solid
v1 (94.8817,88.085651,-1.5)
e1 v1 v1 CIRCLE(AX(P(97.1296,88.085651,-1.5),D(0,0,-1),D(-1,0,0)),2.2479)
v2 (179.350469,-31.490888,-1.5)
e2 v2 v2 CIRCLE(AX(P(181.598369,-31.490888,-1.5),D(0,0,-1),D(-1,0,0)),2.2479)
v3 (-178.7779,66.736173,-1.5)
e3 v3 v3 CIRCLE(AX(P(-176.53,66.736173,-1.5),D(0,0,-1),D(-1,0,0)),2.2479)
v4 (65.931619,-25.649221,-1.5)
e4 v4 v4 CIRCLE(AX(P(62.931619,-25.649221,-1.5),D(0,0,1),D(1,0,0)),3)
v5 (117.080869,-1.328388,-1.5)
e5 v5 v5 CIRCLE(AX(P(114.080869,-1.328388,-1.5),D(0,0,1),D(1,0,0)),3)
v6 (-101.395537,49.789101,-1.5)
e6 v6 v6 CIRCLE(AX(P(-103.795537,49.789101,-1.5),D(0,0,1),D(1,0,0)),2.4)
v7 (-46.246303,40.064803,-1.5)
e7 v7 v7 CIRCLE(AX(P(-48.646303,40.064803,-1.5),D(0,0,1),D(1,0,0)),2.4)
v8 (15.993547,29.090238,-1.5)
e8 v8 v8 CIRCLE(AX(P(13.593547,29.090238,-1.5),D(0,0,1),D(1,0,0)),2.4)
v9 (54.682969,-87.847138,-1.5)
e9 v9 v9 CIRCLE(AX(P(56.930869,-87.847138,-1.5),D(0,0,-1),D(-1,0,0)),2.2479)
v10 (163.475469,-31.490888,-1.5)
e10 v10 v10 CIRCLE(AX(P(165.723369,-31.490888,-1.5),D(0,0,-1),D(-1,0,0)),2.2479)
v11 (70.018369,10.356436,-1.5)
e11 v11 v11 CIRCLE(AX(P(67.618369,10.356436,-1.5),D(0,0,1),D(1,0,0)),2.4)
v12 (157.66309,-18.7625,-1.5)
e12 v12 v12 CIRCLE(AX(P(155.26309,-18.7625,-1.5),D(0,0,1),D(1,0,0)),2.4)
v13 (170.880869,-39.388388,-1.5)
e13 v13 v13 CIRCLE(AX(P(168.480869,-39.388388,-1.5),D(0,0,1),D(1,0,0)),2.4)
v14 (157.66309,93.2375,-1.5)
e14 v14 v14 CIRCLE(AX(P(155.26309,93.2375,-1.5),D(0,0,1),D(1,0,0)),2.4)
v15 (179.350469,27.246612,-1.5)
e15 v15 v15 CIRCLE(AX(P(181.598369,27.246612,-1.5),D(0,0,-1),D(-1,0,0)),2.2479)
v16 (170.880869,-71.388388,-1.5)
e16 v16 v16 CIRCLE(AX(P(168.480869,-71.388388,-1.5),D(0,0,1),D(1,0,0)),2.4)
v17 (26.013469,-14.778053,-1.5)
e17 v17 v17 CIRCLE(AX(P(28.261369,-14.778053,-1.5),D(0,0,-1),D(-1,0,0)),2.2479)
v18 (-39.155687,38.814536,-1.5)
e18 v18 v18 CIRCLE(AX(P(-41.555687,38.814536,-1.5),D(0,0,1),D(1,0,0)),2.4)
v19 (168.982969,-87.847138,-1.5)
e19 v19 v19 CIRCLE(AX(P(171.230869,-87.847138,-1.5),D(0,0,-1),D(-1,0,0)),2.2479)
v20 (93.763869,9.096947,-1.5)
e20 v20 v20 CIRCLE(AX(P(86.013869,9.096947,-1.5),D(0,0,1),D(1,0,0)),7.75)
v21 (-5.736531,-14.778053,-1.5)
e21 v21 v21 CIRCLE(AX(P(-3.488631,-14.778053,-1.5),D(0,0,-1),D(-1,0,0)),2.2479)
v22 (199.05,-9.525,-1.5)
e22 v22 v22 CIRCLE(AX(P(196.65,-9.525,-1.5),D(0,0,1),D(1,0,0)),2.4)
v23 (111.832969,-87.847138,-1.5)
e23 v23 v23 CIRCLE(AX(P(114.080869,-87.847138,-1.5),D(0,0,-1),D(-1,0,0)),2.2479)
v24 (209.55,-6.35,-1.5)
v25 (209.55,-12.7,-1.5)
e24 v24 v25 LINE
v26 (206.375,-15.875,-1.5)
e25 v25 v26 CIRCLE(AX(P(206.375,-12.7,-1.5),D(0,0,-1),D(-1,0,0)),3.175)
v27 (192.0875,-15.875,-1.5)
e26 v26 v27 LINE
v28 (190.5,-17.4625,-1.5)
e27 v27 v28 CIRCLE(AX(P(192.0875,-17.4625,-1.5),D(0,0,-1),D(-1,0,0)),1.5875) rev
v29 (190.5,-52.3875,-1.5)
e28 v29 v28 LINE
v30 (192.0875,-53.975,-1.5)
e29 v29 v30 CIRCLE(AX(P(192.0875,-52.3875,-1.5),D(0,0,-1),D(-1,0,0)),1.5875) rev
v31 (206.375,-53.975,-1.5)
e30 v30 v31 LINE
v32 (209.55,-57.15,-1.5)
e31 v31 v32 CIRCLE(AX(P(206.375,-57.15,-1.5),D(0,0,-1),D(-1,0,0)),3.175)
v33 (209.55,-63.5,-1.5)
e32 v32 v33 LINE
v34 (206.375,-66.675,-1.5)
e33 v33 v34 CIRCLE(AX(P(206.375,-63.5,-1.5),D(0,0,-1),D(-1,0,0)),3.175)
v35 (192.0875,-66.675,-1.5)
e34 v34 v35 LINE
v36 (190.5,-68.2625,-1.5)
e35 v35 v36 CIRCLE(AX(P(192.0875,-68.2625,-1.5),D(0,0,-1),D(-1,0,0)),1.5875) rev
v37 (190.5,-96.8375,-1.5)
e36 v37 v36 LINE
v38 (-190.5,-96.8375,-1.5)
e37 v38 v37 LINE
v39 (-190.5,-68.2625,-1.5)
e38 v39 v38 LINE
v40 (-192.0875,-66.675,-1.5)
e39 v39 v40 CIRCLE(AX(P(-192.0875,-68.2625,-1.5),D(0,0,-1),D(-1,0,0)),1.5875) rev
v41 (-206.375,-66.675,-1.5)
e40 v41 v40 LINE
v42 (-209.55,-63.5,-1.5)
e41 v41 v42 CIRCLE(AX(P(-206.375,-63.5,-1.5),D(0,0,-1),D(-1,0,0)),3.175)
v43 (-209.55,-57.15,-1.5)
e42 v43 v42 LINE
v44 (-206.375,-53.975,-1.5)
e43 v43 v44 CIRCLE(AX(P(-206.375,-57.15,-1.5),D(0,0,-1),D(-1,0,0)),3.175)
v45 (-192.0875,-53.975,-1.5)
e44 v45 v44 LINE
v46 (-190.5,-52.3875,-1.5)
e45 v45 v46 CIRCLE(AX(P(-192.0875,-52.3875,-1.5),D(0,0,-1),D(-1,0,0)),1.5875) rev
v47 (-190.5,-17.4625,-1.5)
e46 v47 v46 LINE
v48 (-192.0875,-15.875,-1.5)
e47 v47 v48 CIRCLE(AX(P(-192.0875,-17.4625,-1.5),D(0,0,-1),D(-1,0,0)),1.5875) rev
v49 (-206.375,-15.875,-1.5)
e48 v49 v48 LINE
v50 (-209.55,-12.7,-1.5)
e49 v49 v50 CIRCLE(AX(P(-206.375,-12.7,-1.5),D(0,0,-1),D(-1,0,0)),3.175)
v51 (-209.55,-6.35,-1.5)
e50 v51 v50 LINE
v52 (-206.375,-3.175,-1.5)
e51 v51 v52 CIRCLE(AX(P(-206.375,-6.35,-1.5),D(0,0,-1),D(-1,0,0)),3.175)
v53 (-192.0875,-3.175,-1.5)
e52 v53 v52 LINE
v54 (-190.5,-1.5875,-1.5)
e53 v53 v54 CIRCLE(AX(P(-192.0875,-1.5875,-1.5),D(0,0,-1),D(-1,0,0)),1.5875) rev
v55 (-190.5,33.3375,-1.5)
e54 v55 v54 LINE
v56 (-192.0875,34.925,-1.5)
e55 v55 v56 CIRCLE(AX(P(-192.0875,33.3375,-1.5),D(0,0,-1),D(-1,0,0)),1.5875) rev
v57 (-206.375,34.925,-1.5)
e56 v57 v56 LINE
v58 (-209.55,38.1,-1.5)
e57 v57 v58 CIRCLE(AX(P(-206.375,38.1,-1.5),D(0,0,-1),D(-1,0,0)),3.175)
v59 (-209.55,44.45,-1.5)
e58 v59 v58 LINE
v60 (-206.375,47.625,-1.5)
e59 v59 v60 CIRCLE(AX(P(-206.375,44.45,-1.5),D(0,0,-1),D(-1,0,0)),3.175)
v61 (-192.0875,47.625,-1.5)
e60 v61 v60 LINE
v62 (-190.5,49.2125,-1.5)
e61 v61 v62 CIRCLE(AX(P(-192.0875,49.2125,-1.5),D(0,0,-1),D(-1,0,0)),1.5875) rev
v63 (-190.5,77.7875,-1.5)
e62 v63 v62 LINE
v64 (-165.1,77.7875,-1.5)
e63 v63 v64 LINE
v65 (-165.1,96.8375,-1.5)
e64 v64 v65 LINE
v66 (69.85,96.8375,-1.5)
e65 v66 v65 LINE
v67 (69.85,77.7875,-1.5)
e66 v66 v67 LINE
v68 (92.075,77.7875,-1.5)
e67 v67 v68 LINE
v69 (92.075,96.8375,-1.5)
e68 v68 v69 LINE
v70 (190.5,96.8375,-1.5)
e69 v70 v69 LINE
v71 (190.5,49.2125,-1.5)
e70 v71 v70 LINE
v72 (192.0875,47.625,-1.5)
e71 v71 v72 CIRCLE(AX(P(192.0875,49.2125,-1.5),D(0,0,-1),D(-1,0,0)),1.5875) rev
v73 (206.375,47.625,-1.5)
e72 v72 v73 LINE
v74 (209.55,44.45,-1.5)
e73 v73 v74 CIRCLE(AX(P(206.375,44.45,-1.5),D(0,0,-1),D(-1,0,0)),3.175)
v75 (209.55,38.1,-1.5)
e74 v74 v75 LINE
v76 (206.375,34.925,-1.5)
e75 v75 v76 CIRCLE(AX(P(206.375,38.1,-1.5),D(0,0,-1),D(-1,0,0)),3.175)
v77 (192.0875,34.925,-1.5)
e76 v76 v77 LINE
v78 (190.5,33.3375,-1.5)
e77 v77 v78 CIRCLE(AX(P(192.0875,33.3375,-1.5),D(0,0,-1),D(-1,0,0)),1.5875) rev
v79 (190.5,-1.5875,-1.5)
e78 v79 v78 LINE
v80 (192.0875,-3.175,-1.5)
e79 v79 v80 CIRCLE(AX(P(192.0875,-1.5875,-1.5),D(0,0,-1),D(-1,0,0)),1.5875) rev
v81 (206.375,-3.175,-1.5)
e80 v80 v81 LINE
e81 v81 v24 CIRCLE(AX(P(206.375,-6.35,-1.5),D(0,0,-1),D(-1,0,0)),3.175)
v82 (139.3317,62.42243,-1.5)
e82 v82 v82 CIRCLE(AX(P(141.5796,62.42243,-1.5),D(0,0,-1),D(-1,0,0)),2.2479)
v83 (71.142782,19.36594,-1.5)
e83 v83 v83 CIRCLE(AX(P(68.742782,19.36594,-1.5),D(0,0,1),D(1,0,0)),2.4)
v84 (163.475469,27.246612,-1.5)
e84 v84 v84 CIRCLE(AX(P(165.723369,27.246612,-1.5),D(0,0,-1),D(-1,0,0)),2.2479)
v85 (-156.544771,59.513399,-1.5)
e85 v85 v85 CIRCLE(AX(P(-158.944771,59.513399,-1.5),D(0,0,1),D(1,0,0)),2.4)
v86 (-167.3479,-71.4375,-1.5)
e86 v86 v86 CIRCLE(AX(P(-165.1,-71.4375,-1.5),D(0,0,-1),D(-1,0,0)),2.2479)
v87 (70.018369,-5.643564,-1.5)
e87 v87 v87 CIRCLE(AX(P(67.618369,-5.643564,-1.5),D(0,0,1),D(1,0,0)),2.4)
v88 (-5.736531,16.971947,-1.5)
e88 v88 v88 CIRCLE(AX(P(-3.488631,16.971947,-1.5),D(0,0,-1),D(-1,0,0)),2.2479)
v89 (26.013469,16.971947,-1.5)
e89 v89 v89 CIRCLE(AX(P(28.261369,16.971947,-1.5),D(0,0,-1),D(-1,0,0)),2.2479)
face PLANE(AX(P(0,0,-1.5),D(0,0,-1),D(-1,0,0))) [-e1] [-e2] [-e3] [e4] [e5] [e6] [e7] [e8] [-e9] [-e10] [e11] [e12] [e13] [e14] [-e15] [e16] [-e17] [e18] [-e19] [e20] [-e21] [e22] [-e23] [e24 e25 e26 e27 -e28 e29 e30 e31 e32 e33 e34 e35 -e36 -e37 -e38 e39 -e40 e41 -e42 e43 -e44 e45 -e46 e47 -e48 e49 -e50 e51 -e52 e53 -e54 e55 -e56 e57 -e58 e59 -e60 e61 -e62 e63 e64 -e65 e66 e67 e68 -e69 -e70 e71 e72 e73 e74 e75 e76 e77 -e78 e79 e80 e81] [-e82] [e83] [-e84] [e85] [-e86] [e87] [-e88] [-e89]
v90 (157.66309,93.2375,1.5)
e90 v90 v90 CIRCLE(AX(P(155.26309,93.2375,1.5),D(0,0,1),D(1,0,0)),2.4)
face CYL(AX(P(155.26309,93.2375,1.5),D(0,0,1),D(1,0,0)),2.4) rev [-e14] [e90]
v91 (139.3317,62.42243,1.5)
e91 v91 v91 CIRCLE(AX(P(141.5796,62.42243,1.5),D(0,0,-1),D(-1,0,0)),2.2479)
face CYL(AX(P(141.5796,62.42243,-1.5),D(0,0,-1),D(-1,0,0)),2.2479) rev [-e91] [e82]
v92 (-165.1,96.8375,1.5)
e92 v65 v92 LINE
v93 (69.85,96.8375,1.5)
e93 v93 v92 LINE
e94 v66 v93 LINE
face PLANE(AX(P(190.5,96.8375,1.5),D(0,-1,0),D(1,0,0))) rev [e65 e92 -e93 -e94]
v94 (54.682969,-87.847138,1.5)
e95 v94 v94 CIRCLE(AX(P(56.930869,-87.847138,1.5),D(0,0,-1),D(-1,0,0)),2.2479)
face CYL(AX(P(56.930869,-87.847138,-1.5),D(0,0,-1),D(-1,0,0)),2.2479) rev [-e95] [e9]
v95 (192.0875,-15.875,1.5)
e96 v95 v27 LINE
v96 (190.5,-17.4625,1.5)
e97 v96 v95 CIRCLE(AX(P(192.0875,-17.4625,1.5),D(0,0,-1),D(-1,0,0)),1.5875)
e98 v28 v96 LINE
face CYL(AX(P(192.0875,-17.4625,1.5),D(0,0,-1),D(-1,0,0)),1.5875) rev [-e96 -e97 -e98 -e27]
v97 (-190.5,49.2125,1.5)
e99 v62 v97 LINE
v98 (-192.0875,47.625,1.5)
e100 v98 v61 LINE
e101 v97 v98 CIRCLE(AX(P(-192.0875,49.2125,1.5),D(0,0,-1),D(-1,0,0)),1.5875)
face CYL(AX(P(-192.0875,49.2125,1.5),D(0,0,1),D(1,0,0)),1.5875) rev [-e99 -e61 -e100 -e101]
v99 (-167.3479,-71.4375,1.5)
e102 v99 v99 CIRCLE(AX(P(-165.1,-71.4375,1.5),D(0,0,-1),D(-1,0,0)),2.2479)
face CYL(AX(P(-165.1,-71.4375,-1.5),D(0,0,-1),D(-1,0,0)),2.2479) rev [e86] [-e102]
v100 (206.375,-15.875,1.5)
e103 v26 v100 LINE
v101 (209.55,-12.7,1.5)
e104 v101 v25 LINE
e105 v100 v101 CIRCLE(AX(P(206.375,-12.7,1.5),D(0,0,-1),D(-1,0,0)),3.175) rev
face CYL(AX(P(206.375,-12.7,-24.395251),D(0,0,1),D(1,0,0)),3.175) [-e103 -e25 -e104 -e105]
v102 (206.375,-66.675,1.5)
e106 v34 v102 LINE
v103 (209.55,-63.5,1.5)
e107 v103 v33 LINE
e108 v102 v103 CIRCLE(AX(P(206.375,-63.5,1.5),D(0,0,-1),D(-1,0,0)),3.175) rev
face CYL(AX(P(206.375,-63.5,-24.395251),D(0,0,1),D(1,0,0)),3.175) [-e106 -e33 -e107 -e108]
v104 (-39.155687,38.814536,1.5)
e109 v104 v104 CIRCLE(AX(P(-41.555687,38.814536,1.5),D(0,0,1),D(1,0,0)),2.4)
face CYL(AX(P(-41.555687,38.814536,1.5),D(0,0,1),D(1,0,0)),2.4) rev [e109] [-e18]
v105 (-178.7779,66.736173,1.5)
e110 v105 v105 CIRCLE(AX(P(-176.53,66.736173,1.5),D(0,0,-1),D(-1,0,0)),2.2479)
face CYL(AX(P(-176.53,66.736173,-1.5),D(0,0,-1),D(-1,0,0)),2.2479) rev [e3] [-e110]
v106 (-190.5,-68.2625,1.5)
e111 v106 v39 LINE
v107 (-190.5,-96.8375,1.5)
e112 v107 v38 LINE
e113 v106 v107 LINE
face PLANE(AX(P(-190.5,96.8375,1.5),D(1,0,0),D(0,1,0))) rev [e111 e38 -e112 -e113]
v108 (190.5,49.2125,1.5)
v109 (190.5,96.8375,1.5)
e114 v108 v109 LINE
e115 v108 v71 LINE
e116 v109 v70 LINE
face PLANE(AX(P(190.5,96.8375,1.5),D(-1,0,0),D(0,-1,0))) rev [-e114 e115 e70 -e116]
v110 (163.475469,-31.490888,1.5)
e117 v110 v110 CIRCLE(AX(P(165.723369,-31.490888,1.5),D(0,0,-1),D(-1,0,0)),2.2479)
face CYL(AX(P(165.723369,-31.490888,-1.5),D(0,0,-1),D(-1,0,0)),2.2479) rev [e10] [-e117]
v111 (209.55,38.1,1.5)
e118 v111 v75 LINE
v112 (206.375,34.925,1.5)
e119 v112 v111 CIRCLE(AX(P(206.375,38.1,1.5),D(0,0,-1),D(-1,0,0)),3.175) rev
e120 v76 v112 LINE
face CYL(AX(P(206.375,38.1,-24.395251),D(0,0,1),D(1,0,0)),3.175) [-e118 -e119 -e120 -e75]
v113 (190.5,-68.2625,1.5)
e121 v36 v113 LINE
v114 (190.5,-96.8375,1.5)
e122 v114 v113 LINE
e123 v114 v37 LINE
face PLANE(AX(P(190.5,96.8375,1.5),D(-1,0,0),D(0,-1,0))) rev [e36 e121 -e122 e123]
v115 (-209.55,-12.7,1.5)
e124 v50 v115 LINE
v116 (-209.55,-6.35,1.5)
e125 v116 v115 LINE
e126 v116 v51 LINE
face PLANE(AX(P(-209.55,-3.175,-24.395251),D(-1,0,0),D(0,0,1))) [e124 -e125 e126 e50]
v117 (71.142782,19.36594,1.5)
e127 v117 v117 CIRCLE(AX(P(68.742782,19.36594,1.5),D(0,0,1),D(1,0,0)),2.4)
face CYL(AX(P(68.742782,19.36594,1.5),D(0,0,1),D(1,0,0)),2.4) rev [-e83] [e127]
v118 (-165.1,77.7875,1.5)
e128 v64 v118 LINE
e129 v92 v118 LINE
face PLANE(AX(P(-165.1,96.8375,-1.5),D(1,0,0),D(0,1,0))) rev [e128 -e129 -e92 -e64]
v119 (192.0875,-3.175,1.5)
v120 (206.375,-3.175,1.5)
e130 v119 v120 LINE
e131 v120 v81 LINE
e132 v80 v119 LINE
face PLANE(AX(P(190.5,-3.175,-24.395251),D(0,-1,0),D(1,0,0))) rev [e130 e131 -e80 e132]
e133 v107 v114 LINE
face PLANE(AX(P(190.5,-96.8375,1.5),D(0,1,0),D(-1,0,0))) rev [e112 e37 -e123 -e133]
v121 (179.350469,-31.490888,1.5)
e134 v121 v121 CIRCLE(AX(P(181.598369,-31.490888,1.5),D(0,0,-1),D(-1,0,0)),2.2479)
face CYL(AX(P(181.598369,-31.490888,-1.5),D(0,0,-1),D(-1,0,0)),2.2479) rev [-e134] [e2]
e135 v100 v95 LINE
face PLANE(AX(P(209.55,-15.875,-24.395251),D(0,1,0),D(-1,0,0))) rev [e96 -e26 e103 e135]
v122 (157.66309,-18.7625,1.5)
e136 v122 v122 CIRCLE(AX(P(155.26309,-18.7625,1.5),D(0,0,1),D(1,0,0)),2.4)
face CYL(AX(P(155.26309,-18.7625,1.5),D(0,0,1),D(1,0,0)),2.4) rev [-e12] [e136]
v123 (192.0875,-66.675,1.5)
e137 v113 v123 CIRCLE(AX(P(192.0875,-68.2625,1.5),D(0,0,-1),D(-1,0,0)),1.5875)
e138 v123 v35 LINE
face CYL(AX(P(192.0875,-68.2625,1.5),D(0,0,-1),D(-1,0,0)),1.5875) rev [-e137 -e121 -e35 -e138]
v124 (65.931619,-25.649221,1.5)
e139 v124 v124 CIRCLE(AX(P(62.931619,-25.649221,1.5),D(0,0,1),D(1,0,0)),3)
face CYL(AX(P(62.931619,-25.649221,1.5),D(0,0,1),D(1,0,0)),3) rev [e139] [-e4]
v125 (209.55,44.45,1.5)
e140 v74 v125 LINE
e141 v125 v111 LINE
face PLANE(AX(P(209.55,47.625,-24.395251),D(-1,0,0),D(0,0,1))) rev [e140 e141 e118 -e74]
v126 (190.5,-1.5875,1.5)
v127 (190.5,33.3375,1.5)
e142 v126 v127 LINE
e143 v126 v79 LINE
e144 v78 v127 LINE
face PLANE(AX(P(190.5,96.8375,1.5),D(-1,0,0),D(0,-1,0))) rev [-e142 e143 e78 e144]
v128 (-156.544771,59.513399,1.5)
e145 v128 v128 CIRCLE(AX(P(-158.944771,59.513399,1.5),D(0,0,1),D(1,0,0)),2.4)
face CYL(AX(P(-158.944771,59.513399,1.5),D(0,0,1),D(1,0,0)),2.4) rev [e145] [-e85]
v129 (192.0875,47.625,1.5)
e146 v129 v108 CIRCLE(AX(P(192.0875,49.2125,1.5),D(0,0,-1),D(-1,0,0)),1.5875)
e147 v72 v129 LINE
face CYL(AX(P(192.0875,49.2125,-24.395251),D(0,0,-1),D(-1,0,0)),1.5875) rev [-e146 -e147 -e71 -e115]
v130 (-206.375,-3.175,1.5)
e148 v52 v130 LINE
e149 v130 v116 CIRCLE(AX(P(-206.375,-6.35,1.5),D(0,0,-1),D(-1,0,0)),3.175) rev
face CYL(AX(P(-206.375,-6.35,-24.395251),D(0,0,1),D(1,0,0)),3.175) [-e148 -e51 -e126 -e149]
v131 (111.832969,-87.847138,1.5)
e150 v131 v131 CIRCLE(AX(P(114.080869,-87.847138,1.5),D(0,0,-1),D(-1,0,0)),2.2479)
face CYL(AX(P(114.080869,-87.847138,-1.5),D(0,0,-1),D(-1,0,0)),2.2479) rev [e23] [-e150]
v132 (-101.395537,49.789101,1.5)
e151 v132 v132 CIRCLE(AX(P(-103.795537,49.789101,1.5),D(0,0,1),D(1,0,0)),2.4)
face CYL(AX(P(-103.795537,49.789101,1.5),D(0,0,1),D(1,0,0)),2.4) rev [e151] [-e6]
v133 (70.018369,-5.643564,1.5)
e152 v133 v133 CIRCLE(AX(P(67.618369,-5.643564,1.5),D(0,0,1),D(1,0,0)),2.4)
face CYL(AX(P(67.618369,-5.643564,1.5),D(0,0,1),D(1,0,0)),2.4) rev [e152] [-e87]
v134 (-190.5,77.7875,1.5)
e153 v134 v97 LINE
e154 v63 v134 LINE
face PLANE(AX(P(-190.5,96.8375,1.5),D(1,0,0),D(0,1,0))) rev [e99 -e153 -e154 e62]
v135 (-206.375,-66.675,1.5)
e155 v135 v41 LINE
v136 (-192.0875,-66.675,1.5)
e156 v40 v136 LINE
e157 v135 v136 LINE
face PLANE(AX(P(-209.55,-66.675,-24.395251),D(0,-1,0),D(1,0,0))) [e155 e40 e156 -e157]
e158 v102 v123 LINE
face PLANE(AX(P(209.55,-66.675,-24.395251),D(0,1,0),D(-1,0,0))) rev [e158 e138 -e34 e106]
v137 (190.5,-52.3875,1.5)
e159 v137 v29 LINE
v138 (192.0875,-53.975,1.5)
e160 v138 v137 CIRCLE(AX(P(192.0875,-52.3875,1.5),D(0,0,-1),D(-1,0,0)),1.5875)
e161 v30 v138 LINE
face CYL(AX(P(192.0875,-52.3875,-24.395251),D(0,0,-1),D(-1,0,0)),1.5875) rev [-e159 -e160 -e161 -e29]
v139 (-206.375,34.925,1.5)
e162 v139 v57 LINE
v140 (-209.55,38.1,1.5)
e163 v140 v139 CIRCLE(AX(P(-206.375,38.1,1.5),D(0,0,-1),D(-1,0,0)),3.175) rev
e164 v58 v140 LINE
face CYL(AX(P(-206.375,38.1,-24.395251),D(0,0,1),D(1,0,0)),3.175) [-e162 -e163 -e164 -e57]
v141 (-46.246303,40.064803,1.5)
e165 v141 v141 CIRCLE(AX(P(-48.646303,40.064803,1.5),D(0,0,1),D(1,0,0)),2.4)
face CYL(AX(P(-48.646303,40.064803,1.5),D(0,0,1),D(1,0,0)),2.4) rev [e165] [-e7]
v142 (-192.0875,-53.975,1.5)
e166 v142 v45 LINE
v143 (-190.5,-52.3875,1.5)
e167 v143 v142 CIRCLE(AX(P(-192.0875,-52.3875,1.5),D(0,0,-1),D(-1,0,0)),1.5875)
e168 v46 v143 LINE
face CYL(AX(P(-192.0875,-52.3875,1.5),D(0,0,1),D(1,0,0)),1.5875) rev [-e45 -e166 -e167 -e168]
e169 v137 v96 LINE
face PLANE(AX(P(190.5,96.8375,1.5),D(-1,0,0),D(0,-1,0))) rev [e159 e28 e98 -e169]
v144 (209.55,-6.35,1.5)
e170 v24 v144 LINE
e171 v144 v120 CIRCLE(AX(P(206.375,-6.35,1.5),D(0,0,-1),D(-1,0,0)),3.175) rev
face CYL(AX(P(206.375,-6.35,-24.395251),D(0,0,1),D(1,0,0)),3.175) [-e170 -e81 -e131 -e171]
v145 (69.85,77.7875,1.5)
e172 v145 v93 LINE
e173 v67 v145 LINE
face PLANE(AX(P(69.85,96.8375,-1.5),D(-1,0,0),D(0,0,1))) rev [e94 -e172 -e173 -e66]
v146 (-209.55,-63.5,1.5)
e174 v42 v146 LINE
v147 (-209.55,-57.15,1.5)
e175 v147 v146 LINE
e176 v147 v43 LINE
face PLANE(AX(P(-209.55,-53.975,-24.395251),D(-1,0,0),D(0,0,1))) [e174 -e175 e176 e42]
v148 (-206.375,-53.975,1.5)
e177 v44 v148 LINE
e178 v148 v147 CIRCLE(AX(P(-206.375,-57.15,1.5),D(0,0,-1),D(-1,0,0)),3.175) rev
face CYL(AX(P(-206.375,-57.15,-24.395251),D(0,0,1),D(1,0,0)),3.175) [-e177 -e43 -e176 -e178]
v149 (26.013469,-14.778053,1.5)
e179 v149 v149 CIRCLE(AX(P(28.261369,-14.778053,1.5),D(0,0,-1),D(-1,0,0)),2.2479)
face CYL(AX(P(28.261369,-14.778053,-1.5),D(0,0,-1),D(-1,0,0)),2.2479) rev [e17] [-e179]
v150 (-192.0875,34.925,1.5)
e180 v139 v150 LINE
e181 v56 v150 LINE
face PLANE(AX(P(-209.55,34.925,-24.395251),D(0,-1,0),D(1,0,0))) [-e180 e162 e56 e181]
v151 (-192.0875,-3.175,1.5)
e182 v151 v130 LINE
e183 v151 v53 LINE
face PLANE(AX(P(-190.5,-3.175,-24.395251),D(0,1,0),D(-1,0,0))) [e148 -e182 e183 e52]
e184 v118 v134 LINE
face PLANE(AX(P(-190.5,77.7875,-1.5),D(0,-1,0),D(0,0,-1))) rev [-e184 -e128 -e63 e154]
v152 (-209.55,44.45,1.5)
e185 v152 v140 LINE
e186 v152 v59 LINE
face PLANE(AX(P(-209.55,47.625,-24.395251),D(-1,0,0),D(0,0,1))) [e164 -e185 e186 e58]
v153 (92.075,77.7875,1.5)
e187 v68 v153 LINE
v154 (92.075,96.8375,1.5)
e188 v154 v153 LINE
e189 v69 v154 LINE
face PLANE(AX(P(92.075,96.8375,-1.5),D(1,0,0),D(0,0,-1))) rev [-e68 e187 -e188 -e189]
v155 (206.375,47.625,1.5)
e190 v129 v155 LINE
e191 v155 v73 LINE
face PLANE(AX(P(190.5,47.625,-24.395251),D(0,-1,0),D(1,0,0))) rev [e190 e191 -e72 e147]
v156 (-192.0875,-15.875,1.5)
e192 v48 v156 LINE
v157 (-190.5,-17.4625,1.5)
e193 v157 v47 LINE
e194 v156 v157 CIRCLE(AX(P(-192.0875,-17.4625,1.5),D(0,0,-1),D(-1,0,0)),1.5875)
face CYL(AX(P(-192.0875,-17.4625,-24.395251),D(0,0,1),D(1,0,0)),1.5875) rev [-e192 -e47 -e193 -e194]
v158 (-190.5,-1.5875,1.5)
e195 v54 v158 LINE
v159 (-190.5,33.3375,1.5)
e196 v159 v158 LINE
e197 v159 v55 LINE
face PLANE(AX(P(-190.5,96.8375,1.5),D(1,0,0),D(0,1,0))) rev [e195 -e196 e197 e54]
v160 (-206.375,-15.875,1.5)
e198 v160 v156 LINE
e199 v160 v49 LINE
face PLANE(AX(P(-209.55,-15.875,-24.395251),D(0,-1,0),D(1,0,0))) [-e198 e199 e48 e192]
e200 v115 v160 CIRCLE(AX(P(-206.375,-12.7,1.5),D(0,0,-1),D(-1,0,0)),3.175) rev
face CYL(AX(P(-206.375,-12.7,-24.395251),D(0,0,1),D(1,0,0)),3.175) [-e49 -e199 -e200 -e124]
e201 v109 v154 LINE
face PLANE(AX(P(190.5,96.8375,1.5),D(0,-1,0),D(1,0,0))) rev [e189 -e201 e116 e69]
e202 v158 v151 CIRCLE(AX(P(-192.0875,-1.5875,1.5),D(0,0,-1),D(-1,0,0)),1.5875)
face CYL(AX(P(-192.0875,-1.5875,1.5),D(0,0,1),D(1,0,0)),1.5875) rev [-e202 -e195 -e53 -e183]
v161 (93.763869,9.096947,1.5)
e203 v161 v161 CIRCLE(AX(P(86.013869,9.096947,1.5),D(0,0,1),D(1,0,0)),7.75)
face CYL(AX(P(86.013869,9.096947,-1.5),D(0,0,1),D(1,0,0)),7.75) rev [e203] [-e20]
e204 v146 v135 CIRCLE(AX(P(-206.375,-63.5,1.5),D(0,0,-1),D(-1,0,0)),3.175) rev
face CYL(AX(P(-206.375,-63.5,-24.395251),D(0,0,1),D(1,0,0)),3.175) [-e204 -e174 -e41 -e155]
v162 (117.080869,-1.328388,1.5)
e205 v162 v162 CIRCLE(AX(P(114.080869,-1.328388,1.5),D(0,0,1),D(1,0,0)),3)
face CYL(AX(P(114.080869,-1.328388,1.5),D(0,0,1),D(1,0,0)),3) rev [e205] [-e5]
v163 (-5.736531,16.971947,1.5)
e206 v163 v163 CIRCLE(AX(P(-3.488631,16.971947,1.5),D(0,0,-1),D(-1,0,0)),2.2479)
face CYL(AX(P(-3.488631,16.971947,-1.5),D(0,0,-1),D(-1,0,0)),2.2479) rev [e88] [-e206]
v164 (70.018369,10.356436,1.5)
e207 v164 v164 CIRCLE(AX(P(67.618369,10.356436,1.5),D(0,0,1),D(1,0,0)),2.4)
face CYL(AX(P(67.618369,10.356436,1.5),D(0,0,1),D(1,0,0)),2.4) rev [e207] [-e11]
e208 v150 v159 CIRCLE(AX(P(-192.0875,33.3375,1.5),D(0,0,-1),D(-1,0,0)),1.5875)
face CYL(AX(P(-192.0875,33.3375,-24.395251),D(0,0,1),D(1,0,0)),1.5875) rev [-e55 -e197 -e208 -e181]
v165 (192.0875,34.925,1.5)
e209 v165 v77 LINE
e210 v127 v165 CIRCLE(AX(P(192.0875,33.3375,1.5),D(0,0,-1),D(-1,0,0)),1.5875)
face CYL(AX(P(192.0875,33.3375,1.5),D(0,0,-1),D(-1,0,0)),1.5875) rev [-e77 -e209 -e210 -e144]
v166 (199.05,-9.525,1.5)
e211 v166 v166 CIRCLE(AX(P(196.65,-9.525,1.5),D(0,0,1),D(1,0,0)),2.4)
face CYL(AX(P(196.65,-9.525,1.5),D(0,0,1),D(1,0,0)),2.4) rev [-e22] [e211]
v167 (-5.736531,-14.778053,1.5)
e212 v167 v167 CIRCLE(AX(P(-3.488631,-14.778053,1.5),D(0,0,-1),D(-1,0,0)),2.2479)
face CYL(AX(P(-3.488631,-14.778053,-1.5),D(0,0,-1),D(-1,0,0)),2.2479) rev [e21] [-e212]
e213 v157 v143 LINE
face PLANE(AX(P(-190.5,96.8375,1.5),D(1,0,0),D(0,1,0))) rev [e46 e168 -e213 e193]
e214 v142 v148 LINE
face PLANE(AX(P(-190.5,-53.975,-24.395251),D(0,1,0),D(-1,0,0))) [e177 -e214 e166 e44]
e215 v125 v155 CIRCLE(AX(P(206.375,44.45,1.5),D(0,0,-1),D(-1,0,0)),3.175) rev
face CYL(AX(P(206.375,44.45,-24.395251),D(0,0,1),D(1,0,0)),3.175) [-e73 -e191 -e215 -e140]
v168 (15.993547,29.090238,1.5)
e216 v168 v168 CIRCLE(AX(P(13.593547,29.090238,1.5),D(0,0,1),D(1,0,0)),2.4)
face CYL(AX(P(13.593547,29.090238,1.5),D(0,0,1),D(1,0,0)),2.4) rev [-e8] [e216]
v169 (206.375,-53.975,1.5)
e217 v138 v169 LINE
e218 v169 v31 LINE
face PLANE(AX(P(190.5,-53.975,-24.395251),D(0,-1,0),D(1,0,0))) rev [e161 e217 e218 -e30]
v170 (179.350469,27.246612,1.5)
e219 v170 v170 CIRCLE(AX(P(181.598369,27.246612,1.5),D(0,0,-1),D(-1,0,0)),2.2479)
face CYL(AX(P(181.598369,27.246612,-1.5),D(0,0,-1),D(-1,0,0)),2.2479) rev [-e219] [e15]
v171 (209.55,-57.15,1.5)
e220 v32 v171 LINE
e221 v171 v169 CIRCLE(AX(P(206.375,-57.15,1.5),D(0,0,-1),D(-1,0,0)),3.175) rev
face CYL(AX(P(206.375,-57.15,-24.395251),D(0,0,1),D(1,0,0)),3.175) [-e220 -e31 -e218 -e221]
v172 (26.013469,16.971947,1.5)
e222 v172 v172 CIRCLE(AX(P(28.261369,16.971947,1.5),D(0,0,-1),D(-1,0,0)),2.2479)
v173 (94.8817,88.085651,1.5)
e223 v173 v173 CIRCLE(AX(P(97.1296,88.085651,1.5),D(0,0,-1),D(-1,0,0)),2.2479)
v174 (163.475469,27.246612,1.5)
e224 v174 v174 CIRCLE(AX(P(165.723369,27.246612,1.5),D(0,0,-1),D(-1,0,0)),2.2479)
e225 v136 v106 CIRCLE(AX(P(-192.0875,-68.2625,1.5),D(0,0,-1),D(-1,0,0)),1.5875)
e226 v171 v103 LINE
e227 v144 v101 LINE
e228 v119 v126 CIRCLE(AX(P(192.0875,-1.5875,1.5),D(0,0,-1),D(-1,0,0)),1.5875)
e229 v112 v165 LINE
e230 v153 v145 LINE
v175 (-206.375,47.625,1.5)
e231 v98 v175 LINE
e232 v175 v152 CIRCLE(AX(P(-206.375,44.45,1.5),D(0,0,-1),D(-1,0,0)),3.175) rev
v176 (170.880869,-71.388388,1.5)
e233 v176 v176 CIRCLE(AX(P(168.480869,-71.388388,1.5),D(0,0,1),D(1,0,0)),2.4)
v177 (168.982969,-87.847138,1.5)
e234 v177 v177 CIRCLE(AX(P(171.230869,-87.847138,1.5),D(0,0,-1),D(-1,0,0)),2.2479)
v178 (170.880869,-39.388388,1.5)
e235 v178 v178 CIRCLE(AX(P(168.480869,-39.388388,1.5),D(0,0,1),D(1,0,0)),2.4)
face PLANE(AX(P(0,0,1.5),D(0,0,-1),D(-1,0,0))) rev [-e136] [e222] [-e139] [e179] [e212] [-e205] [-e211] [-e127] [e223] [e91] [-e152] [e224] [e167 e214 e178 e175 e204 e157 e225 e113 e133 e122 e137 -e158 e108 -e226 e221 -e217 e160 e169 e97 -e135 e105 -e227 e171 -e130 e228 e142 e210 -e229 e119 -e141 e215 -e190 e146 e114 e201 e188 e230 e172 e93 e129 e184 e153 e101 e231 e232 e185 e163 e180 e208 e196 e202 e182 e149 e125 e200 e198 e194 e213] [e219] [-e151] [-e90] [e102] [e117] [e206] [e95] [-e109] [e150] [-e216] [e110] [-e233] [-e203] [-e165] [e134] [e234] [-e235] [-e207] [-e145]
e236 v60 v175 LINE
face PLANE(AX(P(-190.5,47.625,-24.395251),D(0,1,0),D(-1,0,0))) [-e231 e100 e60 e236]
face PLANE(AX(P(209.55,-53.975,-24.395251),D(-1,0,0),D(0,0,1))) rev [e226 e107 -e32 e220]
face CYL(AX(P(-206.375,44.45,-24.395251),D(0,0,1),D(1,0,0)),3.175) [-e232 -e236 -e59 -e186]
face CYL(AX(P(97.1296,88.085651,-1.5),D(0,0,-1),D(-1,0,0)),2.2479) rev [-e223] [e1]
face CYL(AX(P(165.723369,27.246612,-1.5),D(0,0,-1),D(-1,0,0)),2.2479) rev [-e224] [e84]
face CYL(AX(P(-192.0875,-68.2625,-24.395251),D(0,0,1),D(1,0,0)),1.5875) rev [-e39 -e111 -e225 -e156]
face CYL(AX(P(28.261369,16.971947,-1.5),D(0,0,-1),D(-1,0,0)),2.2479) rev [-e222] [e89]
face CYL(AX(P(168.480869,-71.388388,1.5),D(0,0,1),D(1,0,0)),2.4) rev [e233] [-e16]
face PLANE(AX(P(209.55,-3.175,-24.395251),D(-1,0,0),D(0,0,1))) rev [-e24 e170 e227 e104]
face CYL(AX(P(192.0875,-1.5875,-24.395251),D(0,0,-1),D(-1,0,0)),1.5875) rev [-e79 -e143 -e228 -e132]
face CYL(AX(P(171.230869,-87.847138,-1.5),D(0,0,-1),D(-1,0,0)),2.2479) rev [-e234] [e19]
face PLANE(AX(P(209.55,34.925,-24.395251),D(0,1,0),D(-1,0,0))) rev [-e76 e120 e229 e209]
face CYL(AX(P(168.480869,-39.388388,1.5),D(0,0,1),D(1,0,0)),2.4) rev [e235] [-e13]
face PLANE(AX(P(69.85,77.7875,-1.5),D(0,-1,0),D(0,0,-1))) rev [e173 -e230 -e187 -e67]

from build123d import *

# Parameters (mm, degrees)
SKETCH1_W                  = 381
SKETCH1_H                  = 193.675
BOSS_EXTRUDE1_DEPTH        = 1.5
CUT_EXTRUDE1_DEPTH         = 214.72120018
CUT_EXTRUDE1_DEPTH_BACK    = 214.72120018
SKETCH2_W                  = 25.4
SKETCH2_H                  = 19.05
SKETCH2_W_2                = 22.225
SKETCH3_W                  = 19.05
SKETCH3_H                  = 12.7
BOSS_EXTRUDE2_DEPTH        = 3
FILLET1_R                  = 3.175
FILLET1_OF_MIRROR1_R       = 3.175
FILLET2_R                  = 1.5875
LPATTERN1_START            = -1.5
LPATTERN1_DEPTH            = 3
F_1_0MM_DOWEL_HOLE6_D      = 6
F_1_0MM_DOWEL_HOLE5_D      = 6
SKETCH10_R                 = 7.75
CUT_EXTRUDE2_DEPTH         = 231.862954816
F_8_CLEARANCE_HOLE1_D      = 4.4958
F_1_0MM_DOWEL_HOLE1_D      = 4.8
F_1_0_4_8_DIAMETER_HOLE1_D = 4.8


# Read off the part's stored shape, not the designer's step: LPattern1
with BuildPart() as part:
    # Sketch1 → Boss-Extrude1 (new, symmetric)
    with BuildSketch(Plane.XY):
        Rectangle(SKETCH1_W, SKETCH1_H)
    extrude(amount=BOSS_EXTRUDE1_DEPTH, both=True)

    # Sketch2 → Cut-Extrude1 (cut, two sides: drawn at the far end of the back side and taken through both)
    with BuildSketch(Plane.XY.offset(1.5).offset(-CUT_EXTRUDE1_DEPTH_BACK)):
        with Locations((-177.8, 87.3125)):
            Rectangle(SKETCH2_W, SKETCH2_H)
        with Locations((80.9625, 87.3125)):
            Rectangle(SKETCH2_W_2, SKETCH2_H)
    extrude(amount=CUT_EXTRUDE1_DEPTH + CUT_EXTRUDE1_DEPTH_BACK, mode=Mode.SUBTRACT)

    # Sketch3 → Boss-Extrude2 (add)
    with BuildSketch(Plane.XY.offset(1.5)):
        with Locations((-200.025, -9.525)):
            Rectangle(SKETCH3_W, SKETCH3_H)
    boss_extrude2 = extrude(amount=-BOSS_EXTRUDE2_DEPTH)

    # Fillet1
    fillet1_edges = [part.edges().sort_by_distance(p)[0] for p in [
        (-209.55, -3.175, 0),
        (-209.55, -15.875, 0),
    ]]
    fillet(fillet1_edges, radius=FILLET1_R)

    # Mirror1: Boss-Extrude2 across plane
    add(boss_extrude2.mirror(Plane(origin=(0, 0, 0), x_dir=(0, 0, 1), z_dir=(1, 0, 0))))

    # Fillet1 of Mirror1
    fillet1_of_mirror1_edges = [part.edges().sort_by_distance(p)[0] for p in [
        (209.55, -3.175, 0),
        (209.55, -15.875, 0),
    ]]
    fillet(fillet1_of_mirror1_edges, radius=FILLET1_OF_MIRROR1_R)

    # Fillet2
    fillet2_edges = [part.edges().sort_by_distance(p)[0] for p in [
        (-190.5, -15.875, 0),
        (-190.5, -3.175, 0),
        (190.5, -15.875, 0),
        (190.5, -3.175, 0),
    ]]
    fillet(fillet2_edges, radius=FILLET2_R)

    # LPattern1 outline → LPattern1 (add)
    with BuildSketch(Plane.XY.offset(LPATTERN1_START)):
        with BuildLine():
            ThreePointArc((-206.375, 47.625), (-208.62006403, 46.69506403), (-209.55, 44.45))
            Line((-209.55, 44.45), (-209.55, 38.1))
            ThreePointArc((-209.55, 38.1), (-208.62006403, 35.85493597), (-206.375, 34.925))
            Line((-206.375, 34.925), (-192.0875, 34.925))
            ThreePointArc((-192.0875, 34.925), (-190.964967985, 34.460032015), (-190.5, 33.3375))
            Line((-190.5, 33.3375), (-190.5, 49.2125))
            ThreePointArc((-190.5, 49.2125), (-190.964967985, 48.089967985), (-192.0875, 47.625))
            Line((-192.0875, 47.625), (-206.375, 47.625))
        make_face()
        with BuildLine():
            ThreePointArc((-206.375, -53.975), (-208.62006403, -54.90493597), (-209.55, -57.15))
            Line((-209.55, -57.15), (-209.55, -63.5))
            ThreePointArc((-209.55, -63.5), (-208.62006403, -65.74506403), (-206.375, -66.675))
            Line((-206.375, -66.675), (-192.0875, -66.675))
            ThreePointArc((-192.0875, -66.675), (-190.964967985, -67.139967985), (-190.5, -68.2625))
            Line((-190.5, -68.2625), (-190.5, -52.3875))
            ThreePointArc((-190.5, -52.3875), (-190.964967985, -53.510032015), (-192.0875, -53.975))
            Line((-192.0875, -53.975), (-206.375, -53.975))
        make_face()
        with BuildLine():
            Line((209.55, 38.1), (209.55, 44.45))
            ThreePointArc((209.55, 44.45), (208.62006403, 46.69506403), (206.375, 47.625))
            Line((206.375, 47.625), (192.0875, 47.625))
            ThreePointArc((192.0875, 47.625), (190.964967985, 48.089967985), (190.5, 49.2125))
            Line((190.5, 49.2125), (190.5, 33.3375))
            ThreePointArc((190.5, 33.3375), (190.964967985, 34.460032015), (192.0875, 34.925))
            Line((192.0875, 34.925), (206.375, 34.925))
            ThreePointArc((206.375, 34.925), (208.62006403, 35.85493597), (209.55, 38.1))
        make_face()
        with BuildLine():
            Line((209.55, -63.5), (209.55, -57.15))
            ThreePointArc((209.55, -57.15), (208.62006403, -54.90493597), (206.375, -53.975))
            Line((206.375, -53.975), (192.0875, -53.975))
            ThreePointArc((192.0875, -53.975), (190.964967985, -53.510032015), (190.5, -52.3875))
            Line((190.5, -52.3875), (190.5, -68.2625))
            ThreePointArc((190.5, -68.2625), (190.964967985, -67.139967985), (192.0875, -66.675))
            Line((192.0875, -66.675), (206.375, -66.675))
            ThreePointArc((206.375, -66.675), (208.62006403, -65.74506403), (209.55, -63.5))
        make_face()
    extrude(amount=LPATTERN1_DEPTH)

    # Ø1.0mm Dowel Hole6 (through all)
    with Locations(Plane.XY.offset(1.5)):
        with Locations((114.080868605, -1.328387664)):
            Hole(F_1_0MM_DOWEL_HOLE6_D / 2)

    # Ø1.0mm Dowel Hole5 (through all)
    with Locations(Plane.XY.offset(1.5)):
        with Locations((62.931618599, -25.649221104)):
            Hole(F_1_0MM_DOWEL_HOLE5_D / 2)

    # Sketch10 → Cut-Extrude2 (cut, through all)
    with BuildSketch(Plane.XY.offset(1.5)):
        with Locations((86.013868605, 9.09694676)):
            Circle(SKETCH10_R)
    extrude(amount=-CUT_EXTRUDE2_DEPTH, mode=Mode.SUBTRACT)

    # #8 Clearance Hole1 (through all)
    with Locations(Plane(origin=(0, 0, -1.5), x_dir=(-1, 0, 0), z_dir=(0, 0, -1))):
        with Locations((3.488631395, 16.97194676), (-28.261368605, 16.97194676), (-28.261368605, -14.77805324), (3.488631395, -14.77805324), (-56.930868605, -87.847137664), (-114.080868605, -87.847137664), (-171.230868605, -87.847137664), (-165.723368605, 27.246612336), (-181.598368605, 27.246612336), (-181.598368605, -31.490887664), (-165.723368605, -31.490887664), (176.53, 66.736172691), (-97.1296, 88.08565122), (-141.5796, 62.4224304), (165.1, -71.4375)):
            Hole(F_8_CLEARANCE_HOLE1_D / 2)

    # Ø1.0mm Dowel Hole1 (through all)
    with Locations(Plane.XY.offset(1.5)):
        with Locations((-158.944770876, 59.513399002), (-48.646302539, 40.064803103), (-103.795536708, 49.789101052), (-41.555686717, 38.814536224), (13.593547451, 29.090238275), (68.74278162, 19.365940325), (67.618368605, 10.356435791), (67.618368605, -5.643564209), (155.263089531, -18.7625), (155.263089531, 93.2375), (168.480868605, -71.388387664), (168.480868605, -39.388387664)):
            Hole(F_1_0MM_DOWEL_HOLE1_D / 2)

    # Ø1.0 (4.8) Diameter Hole1 (through all)
    with Locations(Plane.XY.offset(1.5)):
        with Locations((196.65, -9.525)):
            Hole(F_1_0_4_8_DIAMETER_HOLE1_D / 2)


solid = part.part
